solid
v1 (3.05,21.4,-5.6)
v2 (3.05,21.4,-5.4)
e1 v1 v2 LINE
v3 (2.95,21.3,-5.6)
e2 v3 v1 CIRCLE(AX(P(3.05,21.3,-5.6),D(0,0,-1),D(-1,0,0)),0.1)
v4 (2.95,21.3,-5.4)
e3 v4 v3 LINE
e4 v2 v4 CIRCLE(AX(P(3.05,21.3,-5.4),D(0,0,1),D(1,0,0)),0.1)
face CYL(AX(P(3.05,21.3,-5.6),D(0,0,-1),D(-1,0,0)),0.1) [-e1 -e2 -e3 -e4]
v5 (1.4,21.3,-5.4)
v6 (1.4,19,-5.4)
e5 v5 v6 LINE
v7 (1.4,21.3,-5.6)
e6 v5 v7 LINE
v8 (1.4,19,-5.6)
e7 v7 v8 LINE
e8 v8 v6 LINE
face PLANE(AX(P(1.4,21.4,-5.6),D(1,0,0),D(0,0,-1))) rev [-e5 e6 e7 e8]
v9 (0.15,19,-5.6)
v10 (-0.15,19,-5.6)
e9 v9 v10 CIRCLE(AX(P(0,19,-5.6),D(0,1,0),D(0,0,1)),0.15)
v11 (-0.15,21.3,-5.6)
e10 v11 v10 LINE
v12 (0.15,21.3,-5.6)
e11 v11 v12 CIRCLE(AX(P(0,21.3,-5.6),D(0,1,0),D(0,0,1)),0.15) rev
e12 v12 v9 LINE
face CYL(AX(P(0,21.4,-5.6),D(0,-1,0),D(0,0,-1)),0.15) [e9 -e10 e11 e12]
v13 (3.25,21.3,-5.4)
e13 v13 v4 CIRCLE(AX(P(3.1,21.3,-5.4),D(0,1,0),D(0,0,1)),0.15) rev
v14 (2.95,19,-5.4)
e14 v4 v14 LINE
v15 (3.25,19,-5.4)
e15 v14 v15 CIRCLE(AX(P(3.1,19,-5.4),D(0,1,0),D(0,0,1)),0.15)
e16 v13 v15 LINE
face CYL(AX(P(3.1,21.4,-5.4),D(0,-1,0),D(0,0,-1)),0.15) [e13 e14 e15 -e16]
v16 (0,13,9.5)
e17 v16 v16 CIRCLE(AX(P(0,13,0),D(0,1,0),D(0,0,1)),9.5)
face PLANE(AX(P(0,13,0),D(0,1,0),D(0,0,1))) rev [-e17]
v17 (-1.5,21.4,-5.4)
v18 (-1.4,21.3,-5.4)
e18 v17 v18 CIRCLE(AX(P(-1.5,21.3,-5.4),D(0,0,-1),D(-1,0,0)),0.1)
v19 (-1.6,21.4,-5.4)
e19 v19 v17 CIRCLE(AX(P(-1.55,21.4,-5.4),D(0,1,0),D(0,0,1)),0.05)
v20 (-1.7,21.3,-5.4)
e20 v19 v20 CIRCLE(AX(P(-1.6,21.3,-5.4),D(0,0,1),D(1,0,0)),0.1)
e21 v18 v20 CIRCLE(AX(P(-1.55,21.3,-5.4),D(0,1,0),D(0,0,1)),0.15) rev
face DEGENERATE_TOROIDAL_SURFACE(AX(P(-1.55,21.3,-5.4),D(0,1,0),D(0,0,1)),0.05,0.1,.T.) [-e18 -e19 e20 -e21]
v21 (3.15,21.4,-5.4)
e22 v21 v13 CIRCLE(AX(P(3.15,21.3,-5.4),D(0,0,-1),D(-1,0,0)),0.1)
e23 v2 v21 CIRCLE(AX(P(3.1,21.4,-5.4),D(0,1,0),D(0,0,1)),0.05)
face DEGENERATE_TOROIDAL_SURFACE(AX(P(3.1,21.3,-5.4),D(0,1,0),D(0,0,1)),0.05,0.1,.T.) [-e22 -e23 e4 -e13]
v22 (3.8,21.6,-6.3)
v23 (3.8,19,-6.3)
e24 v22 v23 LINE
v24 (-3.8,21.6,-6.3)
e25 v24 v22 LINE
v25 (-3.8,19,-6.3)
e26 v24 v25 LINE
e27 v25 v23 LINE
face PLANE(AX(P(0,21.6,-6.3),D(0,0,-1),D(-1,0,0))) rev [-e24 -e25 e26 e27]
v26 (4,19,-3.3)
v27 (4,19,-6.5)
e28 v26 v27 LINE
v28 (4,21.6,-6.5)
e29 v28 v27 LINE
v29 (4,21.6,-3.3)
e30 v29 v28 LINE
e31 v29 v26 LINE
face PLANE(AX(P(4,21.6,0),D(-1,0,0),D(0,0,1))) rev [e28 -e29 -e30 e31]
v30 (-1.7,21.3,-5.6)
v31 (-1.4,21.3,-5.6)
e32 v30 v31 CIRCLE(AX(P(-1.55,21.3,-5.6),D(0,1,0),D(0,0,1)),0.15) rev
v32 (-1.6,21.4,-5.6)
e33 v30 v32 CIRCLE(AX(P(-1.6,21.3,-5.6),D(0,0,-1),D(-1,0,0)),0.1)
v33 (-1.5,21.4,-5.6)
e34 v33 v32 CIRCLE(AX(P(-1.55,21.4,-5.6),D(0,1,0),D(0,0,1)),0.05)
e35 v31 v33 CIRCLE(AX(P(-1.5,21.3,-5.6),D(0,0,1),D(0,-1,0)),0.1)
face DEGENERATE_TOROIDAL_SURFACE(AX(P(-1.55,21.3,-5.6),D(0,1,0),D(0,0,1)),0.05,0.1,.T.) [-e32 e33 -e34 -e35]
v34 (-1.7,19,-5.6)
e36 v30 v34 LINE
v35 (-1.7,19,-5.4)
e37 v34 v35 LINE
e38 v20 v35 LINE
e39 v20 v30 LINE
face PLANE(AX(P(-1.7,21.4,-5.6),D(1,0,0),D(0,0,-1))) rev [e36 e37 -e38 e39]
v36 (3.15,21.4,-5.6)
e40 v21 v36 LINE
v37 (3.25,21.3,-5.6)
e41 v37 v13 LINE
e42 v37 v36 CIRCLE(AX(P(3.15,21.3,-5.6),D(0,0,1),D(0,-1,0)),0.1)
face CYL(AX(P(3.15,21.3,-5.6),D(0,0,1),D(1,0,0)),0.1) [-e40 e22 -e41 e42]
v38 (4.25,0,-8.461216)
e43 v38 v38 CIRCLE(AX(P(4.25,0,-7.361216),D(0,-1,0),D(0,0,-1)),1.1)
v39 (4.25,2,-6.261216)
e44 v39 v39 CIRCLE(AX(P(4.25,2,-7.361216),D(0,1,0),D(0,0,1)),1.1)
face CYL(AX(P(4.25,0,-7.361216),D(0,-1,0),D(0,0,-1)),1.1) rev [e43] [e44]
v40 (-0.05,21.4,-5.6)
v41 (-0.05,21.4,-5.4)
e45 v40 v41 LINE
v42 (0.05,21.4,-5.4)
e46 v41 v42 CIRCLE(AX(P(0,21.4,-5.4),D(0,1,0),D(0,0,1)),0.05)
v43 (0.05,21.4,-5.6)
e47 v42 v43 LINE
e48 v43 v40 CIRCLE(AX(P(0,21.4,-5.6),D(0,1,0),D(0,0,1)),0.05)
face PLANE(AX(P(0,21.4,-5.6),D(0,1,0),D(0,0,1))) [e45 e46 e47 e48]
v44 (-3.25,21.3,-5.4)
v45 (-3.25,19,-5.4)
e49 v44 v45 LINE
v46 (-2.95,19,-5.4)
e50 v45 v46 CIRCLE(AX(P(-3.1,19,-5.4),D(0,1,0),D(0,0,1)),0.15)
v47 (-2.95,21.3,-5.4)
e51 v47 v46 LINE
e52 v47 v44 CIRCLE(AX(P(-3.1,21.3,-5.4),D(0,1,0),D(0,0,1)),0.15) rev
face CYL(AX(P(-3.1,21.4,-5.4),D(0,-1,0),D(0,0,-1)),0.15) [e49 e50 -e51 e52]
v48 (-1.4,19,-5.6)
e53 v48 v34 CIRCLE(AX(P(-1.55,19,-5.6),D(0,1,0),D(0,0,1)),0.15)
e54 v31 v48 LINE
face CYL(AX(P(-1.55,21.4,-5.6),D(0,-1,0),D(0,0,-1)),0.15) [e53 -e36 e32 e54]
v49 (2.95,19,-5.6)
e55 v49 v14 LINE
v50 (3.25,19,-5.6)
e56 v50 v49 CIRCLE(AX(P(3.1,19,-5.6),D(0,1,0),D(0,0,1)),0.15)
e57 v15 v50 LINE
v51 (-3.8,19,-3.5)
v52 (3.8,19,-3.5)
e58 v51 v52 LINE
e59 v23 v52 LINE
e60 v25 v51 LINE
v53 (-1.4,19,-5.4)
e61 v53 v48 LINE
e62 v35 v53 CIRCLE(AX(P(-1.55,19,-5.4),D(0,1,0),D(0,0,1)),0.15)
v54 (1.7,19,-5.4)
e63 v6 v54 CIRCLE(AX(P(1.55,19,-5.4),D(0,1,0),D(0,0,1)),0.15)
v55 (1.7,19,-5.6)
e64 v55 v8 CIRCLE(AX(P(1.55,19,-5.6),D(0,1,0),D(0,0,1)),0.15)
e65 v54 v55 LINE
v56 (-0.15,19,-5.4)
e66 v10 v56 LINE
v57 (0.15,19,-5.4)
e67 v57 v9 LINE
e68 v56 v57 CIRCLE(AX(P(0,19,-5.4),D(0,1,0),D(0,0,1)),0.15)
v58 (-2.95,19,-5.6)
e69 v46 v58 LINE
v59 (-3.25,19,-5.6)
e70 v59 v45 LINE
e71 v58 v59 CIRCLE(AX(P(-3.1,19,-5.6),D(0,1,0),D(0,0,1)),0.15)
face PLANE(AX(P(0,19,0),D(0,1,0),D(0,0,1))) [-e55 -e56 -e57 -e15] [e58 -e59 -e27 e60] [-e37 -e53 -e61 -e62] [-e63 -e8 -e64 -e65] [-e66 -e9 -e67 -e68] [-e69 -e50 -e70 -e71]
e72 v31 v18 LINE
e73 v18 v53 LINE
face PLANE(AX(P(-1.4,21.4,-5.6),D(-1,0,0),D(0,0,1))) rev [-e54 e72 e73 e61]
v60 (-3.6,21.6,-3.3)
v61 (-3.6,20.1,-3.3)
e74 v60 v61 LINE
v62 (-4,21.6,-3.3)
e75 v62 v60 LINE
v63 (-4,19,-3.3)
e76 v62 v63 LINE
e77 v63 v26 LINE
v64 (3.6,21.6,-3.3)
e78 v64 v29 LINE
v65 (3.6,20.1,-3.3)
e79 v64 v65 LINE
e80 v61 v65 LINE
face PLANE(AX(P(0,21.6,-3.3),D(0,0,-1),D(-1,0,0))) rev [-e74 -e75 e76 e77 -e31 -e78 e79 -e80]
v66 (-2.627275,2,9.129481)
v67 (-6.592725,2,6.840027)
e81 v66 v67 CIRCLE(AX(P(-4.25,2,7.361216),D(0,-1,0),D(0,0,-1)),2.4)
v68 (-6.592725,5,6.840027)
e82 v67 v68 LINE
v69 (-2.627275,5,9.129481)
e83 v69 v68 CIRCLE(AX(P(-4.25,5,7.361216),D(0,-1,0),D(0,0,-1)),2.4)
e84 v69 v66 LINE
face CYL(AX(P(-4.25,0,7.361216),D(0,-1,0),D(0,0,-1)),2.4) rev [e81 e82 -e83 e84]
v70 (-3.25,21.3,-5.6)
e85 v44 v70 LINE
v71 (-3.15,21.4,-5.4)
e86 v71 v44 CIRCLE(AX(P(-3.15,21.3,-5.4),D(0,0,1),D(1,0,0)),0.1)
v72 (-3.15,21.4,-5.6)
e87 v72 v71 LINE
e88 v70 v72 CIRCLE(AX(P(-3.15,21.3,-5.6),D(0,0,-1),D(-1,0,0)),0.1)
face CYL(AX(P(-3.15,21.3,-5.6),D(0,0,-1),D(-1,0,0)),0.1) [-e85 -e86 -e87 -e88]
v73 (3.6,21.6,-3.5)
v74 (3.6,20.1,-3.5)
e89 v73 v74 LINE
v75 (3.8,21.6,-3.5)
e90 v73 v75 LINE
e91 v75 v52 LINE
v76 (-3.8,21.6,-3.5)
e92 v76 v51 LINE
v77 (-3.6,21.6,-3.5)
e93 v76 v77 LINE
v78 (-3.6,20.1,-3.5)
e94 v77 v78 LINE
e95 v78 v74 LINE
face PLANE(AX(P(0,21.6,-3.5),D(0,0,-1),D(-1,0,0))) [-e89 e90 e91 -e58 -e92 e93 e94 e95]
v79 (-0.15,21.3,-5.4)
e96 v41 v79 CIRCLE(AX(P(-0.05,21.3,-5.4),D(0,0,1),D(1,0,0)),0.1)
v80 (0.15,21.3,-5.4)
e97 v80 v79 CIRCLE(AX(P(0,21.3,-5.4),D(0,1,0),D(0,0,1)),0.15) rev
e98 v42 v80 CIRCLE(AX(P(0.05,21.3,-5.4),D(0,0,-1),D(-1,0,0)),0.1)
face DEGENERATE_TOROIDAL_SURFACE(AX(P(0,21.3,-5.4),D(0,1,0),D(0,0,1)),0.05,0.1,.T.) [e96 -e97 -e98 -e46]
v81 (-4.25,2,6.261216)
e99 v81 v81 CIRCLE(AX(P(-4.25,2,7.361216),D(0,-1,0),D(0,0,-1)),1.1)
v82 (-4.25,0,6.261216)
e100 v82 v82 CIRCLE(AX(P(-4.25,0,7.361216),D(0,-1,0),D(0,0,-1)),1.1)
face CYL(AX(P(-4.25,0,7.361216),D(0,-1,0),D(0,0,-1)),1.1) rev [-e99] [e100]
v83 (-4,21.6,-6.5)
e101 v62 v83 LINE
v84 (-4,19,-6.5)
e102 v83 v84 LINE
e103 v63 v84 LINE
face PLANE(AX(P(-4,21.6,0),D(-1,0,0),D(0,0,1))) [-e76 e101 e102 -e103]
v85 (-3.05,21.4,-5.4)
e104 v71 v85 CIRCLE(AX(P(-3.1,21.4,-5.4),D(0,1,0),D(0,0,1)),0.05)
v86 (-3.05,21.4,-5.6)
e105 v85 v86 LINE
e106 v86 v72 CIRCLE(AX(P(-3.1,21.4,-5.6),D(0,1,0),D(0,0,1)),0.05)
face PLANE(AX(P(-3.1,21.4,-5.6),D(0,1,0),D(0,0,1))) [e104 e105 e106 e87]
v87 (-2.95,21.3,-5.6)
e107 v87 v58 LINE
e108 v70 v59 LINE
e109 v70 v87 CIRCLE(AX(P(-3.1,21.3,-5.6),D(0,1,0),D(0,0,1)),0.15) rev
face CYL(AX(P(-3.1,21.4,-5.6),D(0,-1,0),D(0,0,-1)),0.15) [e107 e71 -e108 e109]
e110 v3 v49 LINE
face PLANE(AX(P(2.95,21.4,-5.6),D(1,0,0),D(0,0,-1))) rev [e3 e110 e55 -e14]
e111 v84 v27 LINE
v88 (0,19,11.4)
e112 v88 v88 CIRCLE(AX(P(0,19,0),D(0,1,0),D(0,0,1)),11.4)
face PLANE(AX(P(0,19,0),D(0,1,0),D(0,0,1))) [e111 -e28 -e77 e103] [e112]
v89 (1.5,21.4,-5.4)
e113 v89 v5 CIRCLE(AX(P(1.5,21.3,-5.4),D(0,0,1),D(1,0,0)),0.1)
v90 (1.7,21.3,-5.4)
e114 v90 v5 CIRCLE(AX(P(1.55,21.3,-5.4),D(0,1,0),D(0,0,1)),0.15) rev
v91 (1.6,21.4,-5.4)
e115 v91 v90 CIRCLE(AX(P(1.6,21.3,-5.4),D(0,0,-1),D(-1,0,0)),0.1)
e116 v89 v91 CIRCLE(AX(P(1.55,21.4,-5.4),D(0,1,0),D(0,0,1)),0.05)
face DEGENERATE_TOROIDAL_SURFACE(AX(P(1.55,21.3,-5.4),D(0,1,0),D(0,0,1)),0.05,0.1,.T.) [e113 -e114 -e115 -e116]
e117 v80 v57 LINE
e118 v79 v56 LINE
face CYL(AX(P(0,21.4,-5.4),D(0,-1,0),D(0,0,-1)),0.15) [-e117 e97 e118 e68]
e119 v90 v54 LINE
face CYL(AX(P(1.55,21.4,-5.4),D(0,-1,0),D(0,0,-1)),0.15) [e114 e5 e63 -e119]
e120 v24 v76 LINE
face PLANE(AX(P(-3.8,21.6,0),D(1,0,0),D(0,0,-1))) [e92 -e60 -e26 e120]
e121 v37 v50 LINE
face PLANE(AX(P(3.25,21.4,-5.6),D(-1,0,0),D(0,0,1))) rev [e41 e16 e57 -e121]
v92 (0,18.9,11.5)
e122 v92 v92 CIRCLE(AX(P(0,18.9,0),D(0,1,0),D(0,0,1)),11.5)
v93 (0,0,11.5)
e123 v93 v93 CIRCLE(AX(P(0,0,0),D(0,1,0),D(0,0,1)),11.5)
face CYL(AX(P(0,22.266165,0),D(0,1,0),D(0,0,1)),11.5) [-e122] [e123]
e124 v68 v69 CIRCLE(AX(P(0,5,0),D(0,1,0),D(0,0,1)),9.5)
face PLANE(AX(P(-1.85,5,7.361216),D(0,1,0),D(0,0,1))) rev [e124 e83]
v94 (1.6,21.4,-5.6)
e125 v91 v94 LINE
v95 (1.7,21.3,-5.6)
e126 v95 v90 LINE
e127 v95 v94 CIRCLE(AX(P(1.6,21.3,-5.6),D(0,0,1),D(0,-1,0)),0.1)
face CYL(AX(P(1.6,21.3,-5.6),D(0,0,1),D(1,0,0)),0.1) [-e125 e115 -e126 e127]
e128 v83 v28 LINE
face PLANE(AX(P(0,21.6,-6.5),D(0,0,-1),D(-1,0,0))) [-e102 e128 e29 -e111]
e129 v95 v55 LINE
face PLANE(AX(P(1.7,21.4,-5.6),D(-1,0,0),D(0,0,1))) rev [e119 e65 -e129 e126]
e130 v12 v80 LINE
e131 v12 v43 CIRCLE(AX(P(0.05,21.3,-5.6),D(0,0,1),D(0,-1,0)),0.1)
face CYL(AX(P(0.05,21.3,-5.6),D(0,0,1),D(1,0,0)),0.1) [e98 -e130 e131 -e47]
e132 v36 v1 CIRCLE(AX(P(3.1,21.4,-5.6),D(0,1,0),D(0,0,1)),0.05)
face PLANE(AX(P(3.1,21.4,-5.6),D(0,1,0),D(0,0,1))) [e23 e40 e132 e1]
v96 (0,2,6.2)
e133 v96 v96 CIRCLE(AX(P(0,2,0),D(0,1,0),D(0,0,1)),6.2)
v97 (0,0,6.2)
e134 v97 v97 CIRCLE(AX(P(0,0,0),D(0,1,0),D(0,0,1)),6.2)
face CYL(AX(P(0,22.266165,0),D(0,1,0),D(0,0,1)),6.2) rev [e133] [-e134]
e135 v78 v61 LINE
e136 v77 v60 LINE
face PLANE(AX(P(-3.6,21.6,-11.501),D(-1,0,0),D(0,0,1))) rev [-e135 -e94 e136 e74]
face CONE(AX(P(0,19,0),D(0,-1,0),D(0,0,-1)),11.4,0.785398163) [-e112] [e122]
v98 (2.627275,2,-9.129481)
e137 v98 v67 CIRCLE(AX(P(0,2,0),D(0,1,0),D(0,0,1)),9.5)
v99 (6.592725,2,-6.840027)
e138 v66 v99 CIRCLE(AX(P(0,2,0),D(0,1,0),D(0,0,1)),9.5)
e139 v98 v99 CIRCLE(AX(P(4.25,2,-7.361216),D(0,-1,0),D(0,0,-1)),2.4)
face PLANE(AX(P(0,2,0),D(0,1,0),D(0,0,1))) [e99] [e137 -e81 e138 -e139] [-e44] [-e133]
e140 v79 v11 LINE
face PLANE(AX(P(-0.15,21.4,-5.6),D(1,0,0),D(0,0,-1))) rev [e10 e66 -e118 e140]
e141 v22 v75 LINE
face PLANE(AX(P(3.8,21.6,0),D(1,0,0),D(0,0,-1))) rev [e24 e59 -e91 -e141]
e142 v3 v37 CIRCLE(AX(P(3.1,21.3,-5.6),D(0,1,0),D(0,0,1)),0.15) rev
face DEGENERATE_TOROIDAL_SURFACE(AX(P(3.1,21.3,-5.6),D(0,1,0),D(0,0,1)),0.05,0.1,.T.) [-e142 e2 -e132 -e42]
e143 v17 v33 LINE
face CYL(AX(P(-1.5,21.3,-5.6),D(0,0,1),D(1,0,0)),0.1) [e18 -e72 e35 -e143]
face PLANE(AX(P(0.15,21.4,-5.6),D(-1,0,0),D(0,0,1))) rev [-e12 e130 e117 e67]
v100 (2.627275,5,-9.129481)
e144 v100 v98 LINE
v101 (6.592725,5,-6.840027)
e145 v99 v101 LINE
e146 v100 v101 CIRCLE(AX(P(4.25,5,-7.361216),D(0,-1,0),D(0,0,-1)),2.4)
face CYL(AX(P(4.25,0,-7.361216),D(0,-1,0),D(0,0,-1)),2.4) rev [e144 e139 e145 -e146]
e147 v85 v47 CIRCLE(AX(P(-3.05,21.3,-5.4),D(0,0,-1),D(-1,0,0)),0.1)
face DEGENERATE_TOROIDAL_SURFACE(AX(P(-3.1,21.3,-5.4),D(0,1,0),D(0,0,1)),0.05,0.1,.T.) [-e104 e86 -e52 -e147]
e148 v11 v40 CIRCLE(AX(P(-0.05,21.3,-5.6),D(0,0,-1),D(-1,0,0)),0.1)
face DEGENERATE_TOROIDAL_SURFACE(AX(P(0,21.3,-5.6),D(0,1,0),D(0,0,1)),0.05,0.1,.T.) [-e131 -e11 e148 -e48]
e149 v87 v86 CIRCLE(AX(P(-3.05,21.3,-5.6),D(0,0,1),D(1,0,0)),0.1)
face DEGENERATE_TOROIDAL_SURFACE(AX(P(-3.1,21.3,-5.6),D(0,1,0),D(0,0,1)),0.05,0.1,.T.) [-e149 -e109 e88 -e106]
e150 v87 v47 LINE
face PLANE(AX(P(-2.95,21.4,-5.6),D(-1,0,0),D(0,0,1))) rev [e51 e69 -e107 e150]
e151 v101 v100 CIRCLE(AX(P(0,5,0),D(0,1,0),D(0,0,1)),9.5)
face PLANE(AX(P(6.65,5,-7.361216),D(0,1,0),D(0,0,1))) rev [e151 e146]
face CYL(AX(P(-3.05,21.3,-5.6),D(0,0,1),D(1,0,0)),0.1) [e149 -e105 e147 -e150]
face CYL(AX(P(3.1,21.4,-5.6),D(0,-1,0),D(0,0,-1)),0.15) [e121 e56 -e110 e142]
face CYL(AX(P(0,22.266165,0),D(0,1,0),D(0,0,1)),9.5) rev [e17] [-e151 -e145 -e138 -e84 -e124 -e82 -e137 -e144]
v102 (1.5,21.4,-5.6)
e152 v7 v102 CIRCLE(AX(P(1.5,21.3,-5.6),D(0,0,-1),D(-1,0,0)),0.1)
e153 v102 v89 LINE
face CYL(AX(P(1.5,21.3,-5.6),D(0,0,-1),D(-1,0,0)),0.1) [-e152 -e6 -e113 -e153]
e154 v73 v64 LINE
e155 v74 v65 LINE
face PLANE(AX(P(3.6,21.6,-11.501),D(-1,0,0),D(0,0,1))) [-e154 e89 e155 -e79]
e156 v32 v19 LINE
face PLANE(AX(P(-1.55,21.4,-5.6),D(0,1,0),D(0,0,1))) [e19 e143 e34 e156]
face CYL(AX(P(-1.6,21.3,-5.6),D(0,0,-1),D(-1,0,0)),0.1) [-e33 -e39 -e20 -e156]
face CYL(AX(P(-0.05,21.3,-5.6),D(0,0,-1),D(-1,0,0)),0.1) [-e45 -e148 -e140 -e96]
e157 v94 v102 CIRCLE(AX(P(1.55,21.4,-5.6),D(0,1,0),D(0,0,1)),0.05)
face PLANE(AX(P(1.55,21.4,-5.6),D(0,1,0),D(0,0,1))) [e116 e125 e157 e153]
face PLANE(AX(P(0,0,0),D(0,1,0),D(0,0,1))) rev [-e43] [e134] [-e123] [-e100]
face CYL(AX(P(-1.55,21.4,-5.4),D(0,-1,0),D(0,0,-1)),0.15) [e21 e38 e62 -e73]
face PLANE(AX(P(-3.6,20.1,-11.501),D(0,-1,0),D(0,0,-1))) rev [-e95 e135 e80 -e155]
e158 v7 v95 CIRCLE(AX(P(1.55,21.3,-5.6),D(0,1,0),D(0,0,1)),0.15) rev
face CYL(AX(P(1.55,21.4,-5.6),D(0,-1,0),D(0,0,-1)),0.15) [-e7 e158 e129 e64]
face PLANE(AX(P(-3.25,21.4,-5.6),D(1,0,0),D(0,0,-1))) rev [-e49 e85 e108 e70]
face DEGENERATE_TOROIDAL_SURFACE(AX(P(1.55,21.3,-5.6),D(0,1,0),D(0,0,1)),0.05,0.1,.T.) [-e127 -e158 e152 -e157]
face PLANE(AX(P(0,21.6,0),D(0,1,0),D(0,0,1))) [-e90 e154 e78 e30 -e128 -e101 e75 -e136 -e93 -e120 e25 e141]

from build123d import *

# Parameters (mm, degrees)
ZAAWANSOWANYOTW_R1_START       = 2
ZAAWANSOWANYOTW_R1_DEPTH       = 3
ZAAWANSOWANYOTW_R1_2_OUTLINE_R = 1.1
ZAAWANSOWANYOTW_R1_2_DEPTH     = 2
SZKIC6_W                       = 8
SZKIC6_H                       = 3.2
SZKIC6_W_2                     = 7.6
SZKIC6_H_2                     = 2.8
DODANIE_WYCI_GNI_CIE1_DEPTH    = 2.6
WYTNIJ_WYCI_GNI_CIE1_REACH     = 30.598
SZKIC7_W                       = 7.2
SZKIC7_H                       = 1.5
DODANIE_WYCI_GNI_CIE2_DEPTH    = 2.4
ZAOKR_GLENIE1_R                = 0.1


# Read off the part's stored shape, not the designer's step: ZaawansowanyOtwór1
with BuildPart() as part:
    # Szkic1 → Obrót1 (revolve)
    with BuildSketch(Plane(origin=(0, 0, 0), x_dir=(0, 0, -1), z_dir=(1, 0, 0))):
        Polygon((0, 19), (-11.4, 19), (-11.5, 18.9), (-11.5, 0), (-6.2, 0), (-6.2, 2), (-9.5, 2), (-9.5, 13), (0, 13), align=None)
    revolve(axis=Axis((0, 22.266164505, 0), (0, -1, 0)))

    # ZaawansowanyOtwór1 outline → ZaawansowanyOtwór1 (cut)
    with BuildSketch(Plane(origin=(0, 0, 0), x_dir=(1, 0, 0), z_dir=(0, 1, 0)).offset(ZAAWANSOWANYOTW_R1_START)):
        with BuildLine():
            ThreePointArc((6.592725397, 6.840027181), (5.45, 9.439676901), (2.627274603, 9.129481265))
            ThreePointArc((2.627274603, 9.129481265), (4.75, 8.227241336), (6.592725397, 6.840027181))
        make_face()
        with BuildLine():
            ThreePointArc((-6.592725397, -6.840027181), (-5.45, -9.439676901), (-2.627274603, -9.129481265))
            ThreePointArc((-2.627274603, -9.129481265), (-4.75, -8.227241336), (-6.592725397, -6.840027181))
        make_face()
    extrude(amount=ZAAWANSOWANYOTW_R1_DEPTH, mode=Mode.SUBTRACT)

    # ZaawansowanyOtw_r1 2 outline → ZaawansowanyOtw_r1 2 (cut)
    with BuildSketch(Plane(origin=(0, 0, 0), x_dir=(1, 0, 0), z_dir=(0, 1, 0))):
        with Locations((4.25, 7.361215932)):
            Circle(ZAAWANSOWANYOTW_R1_2_OUTLINE_R)
        with Locations((-4.25, -7.361215932)):
            Circle(ZAAWANSOWANYOTW_R1_2_OUTLINE_R)
    extrude(amount=ZAAWANSOWANYOTW_R1_2_DEPTH, mode=Mode.SUBTRACT)

    # Szkic6 → Dodanie-wyciągnięcie1 (add)
    with BuildSketch(Plane(origin=(0, 19, 0), x_dir=(1, 0, 0), z_dir=(0, 1, 0))):
        with Locations((0, 4.9)):
            Rectangle(SZKIC6_W, SZKIC6_H)
        with Locations((0, 4.9)):
            Rectangle(SZKIC6_W_2, SZKIC6_H_2, mode=Mode.SUBTRACT)
    extrude(amount=DODANIE_WYCI_GNI_CIE1_DEPTH)

    # Szkic7 → Wytnij-wyciągnięcie1 (cut, up to next)
    with BuildSketch(Plane.XY.offset(-3.3), mode=Mode.PRIVATE) as wytnij_wyci_gni_cie1_sk1:
        with Locations((0, 20.85)):
            Rectangle(SZKIC7_W, SZKIC7_H)
    wytnij_wyci_gni_cie1_tool1 = extrude(wytnij_wyci_gni_cie1_sk1.sketch, amount=-WYTNIJ_WYCI_GNI_CIE1_REACH, mode=Mode.PRIVATE) & part.part
    add(wytnij_wyci_gni_cie1_tool1.solids().sort_by_distance((0, 20.85, -3.3))[0], mode=Mode.SUBTRACT)

    # Szkic8 → Dodanie-wyciągnięcie2 (add)
    with BuildSketch(Plane(origin=(0, 19, 0), x_dir=(1, 0, 0), z_dir=(0, 1, 0))):
        with BuildLine():
            Line((-2.95, 5.6), (-2.95, 5.4))
            ThreePointArc((-2.95, 5.4), (-3.1, 5.25), (-3.25, 5.4))
            Line((-3.25, 5.4), (-3.25, 5.6))
            ThreePointArc((-3.25, 5.6), (-3.1, 5.75), (-2.95, 5.6))
        make_face()
        with BuildLine():
            Line((-1.4, 5.6), (-1.4, 5.4))
            ThreePointArc((-1.4, 5.4), (-1.55, 5.25), (-1.7, 5.4))
            Line((-1.7, 5.4), (-1.7, 5.6))
            ThreePointArc((-1.7, 5.6), (-1.55, 5.75), (-1.4, 5.6))
        make_face()
        with BuildLine():
            Line((0.15, 5.6), (0.15, 5.4))
            ThreePointArc((0.15, 5.4), (0, 5.25), (-0.15, 5.4))
            Line((-0.15, 5.4), (-0.15, 5.6))
            ThreePointArc((-0.15, 5.6), (0, 5.75), (0.15, 5.6))
        make_face()
        with BuildLine():
            Line((1.7, 5.6), (1.7, 5.4))
            ThreePointArc((1.7, 5.4), (1.55, 5.25), (1.4, 5.4))
            Line((1.4, 5.4), (1.4, 5.6))
            ThreePointArc((1.4, 5.6), (1.55, 5.75), (1.7, 5.6))
        make_face()
        with BuildLine():
            Line((3.25, 5.6), (3.25, 5.4))
            ThreePointArc((3.25, 5.4), (3.1, 5.25), (2.95, 5.4))
            Line((2.95, 5.4), (2.95, 5.6))
            ThreePointArc((2.95, 5.6), (3.1, 5.75), (3.25, 5.6))
        make_face()
    extrude(amount=DODANIE_WYCI_GNI_CIE2_DEPTH)

    # Zaokrąglenie1
    zaokr_glenie1_edges = [part.edges().sort_by_distance(p)[0] for p in [
        (-1.55, 21.4, -5.75),
        (-1.7, 21.4, -5.5),
        (-1.55, 21.4, -5.25),
        (-1.4, 21.4, -5.5),
        (0, 21.4, -5.75),
        (-0.15, 21.4, -5.5),
        (0, 21.4, -5.25),
        (0.15, 21.4, -5.5),
        (1.55, 21.4, -5.75),
        (1.4, 21.4, -5.5),
        (1.55, 21.4, -5.25),
        (1.7, 21.4, -5.5),
        (3.1, 21.4, -5.75),
        (2.95, 21.4, -5.5),
        (3.1, 21.4, -5.25),
        (3.25, 21.4, -5.5),
        (-3.1, 21.4, -5.75),
        (-3.25, 21.4, -5.5),
        (-3.1, 21.4, -5.25),
        (-2.95, 21.4, -5.5),
    ]]
    fillet(zaokr_glenie1_edges, radius=ZAOKR_GLENIE1_R)


solid = part.part
